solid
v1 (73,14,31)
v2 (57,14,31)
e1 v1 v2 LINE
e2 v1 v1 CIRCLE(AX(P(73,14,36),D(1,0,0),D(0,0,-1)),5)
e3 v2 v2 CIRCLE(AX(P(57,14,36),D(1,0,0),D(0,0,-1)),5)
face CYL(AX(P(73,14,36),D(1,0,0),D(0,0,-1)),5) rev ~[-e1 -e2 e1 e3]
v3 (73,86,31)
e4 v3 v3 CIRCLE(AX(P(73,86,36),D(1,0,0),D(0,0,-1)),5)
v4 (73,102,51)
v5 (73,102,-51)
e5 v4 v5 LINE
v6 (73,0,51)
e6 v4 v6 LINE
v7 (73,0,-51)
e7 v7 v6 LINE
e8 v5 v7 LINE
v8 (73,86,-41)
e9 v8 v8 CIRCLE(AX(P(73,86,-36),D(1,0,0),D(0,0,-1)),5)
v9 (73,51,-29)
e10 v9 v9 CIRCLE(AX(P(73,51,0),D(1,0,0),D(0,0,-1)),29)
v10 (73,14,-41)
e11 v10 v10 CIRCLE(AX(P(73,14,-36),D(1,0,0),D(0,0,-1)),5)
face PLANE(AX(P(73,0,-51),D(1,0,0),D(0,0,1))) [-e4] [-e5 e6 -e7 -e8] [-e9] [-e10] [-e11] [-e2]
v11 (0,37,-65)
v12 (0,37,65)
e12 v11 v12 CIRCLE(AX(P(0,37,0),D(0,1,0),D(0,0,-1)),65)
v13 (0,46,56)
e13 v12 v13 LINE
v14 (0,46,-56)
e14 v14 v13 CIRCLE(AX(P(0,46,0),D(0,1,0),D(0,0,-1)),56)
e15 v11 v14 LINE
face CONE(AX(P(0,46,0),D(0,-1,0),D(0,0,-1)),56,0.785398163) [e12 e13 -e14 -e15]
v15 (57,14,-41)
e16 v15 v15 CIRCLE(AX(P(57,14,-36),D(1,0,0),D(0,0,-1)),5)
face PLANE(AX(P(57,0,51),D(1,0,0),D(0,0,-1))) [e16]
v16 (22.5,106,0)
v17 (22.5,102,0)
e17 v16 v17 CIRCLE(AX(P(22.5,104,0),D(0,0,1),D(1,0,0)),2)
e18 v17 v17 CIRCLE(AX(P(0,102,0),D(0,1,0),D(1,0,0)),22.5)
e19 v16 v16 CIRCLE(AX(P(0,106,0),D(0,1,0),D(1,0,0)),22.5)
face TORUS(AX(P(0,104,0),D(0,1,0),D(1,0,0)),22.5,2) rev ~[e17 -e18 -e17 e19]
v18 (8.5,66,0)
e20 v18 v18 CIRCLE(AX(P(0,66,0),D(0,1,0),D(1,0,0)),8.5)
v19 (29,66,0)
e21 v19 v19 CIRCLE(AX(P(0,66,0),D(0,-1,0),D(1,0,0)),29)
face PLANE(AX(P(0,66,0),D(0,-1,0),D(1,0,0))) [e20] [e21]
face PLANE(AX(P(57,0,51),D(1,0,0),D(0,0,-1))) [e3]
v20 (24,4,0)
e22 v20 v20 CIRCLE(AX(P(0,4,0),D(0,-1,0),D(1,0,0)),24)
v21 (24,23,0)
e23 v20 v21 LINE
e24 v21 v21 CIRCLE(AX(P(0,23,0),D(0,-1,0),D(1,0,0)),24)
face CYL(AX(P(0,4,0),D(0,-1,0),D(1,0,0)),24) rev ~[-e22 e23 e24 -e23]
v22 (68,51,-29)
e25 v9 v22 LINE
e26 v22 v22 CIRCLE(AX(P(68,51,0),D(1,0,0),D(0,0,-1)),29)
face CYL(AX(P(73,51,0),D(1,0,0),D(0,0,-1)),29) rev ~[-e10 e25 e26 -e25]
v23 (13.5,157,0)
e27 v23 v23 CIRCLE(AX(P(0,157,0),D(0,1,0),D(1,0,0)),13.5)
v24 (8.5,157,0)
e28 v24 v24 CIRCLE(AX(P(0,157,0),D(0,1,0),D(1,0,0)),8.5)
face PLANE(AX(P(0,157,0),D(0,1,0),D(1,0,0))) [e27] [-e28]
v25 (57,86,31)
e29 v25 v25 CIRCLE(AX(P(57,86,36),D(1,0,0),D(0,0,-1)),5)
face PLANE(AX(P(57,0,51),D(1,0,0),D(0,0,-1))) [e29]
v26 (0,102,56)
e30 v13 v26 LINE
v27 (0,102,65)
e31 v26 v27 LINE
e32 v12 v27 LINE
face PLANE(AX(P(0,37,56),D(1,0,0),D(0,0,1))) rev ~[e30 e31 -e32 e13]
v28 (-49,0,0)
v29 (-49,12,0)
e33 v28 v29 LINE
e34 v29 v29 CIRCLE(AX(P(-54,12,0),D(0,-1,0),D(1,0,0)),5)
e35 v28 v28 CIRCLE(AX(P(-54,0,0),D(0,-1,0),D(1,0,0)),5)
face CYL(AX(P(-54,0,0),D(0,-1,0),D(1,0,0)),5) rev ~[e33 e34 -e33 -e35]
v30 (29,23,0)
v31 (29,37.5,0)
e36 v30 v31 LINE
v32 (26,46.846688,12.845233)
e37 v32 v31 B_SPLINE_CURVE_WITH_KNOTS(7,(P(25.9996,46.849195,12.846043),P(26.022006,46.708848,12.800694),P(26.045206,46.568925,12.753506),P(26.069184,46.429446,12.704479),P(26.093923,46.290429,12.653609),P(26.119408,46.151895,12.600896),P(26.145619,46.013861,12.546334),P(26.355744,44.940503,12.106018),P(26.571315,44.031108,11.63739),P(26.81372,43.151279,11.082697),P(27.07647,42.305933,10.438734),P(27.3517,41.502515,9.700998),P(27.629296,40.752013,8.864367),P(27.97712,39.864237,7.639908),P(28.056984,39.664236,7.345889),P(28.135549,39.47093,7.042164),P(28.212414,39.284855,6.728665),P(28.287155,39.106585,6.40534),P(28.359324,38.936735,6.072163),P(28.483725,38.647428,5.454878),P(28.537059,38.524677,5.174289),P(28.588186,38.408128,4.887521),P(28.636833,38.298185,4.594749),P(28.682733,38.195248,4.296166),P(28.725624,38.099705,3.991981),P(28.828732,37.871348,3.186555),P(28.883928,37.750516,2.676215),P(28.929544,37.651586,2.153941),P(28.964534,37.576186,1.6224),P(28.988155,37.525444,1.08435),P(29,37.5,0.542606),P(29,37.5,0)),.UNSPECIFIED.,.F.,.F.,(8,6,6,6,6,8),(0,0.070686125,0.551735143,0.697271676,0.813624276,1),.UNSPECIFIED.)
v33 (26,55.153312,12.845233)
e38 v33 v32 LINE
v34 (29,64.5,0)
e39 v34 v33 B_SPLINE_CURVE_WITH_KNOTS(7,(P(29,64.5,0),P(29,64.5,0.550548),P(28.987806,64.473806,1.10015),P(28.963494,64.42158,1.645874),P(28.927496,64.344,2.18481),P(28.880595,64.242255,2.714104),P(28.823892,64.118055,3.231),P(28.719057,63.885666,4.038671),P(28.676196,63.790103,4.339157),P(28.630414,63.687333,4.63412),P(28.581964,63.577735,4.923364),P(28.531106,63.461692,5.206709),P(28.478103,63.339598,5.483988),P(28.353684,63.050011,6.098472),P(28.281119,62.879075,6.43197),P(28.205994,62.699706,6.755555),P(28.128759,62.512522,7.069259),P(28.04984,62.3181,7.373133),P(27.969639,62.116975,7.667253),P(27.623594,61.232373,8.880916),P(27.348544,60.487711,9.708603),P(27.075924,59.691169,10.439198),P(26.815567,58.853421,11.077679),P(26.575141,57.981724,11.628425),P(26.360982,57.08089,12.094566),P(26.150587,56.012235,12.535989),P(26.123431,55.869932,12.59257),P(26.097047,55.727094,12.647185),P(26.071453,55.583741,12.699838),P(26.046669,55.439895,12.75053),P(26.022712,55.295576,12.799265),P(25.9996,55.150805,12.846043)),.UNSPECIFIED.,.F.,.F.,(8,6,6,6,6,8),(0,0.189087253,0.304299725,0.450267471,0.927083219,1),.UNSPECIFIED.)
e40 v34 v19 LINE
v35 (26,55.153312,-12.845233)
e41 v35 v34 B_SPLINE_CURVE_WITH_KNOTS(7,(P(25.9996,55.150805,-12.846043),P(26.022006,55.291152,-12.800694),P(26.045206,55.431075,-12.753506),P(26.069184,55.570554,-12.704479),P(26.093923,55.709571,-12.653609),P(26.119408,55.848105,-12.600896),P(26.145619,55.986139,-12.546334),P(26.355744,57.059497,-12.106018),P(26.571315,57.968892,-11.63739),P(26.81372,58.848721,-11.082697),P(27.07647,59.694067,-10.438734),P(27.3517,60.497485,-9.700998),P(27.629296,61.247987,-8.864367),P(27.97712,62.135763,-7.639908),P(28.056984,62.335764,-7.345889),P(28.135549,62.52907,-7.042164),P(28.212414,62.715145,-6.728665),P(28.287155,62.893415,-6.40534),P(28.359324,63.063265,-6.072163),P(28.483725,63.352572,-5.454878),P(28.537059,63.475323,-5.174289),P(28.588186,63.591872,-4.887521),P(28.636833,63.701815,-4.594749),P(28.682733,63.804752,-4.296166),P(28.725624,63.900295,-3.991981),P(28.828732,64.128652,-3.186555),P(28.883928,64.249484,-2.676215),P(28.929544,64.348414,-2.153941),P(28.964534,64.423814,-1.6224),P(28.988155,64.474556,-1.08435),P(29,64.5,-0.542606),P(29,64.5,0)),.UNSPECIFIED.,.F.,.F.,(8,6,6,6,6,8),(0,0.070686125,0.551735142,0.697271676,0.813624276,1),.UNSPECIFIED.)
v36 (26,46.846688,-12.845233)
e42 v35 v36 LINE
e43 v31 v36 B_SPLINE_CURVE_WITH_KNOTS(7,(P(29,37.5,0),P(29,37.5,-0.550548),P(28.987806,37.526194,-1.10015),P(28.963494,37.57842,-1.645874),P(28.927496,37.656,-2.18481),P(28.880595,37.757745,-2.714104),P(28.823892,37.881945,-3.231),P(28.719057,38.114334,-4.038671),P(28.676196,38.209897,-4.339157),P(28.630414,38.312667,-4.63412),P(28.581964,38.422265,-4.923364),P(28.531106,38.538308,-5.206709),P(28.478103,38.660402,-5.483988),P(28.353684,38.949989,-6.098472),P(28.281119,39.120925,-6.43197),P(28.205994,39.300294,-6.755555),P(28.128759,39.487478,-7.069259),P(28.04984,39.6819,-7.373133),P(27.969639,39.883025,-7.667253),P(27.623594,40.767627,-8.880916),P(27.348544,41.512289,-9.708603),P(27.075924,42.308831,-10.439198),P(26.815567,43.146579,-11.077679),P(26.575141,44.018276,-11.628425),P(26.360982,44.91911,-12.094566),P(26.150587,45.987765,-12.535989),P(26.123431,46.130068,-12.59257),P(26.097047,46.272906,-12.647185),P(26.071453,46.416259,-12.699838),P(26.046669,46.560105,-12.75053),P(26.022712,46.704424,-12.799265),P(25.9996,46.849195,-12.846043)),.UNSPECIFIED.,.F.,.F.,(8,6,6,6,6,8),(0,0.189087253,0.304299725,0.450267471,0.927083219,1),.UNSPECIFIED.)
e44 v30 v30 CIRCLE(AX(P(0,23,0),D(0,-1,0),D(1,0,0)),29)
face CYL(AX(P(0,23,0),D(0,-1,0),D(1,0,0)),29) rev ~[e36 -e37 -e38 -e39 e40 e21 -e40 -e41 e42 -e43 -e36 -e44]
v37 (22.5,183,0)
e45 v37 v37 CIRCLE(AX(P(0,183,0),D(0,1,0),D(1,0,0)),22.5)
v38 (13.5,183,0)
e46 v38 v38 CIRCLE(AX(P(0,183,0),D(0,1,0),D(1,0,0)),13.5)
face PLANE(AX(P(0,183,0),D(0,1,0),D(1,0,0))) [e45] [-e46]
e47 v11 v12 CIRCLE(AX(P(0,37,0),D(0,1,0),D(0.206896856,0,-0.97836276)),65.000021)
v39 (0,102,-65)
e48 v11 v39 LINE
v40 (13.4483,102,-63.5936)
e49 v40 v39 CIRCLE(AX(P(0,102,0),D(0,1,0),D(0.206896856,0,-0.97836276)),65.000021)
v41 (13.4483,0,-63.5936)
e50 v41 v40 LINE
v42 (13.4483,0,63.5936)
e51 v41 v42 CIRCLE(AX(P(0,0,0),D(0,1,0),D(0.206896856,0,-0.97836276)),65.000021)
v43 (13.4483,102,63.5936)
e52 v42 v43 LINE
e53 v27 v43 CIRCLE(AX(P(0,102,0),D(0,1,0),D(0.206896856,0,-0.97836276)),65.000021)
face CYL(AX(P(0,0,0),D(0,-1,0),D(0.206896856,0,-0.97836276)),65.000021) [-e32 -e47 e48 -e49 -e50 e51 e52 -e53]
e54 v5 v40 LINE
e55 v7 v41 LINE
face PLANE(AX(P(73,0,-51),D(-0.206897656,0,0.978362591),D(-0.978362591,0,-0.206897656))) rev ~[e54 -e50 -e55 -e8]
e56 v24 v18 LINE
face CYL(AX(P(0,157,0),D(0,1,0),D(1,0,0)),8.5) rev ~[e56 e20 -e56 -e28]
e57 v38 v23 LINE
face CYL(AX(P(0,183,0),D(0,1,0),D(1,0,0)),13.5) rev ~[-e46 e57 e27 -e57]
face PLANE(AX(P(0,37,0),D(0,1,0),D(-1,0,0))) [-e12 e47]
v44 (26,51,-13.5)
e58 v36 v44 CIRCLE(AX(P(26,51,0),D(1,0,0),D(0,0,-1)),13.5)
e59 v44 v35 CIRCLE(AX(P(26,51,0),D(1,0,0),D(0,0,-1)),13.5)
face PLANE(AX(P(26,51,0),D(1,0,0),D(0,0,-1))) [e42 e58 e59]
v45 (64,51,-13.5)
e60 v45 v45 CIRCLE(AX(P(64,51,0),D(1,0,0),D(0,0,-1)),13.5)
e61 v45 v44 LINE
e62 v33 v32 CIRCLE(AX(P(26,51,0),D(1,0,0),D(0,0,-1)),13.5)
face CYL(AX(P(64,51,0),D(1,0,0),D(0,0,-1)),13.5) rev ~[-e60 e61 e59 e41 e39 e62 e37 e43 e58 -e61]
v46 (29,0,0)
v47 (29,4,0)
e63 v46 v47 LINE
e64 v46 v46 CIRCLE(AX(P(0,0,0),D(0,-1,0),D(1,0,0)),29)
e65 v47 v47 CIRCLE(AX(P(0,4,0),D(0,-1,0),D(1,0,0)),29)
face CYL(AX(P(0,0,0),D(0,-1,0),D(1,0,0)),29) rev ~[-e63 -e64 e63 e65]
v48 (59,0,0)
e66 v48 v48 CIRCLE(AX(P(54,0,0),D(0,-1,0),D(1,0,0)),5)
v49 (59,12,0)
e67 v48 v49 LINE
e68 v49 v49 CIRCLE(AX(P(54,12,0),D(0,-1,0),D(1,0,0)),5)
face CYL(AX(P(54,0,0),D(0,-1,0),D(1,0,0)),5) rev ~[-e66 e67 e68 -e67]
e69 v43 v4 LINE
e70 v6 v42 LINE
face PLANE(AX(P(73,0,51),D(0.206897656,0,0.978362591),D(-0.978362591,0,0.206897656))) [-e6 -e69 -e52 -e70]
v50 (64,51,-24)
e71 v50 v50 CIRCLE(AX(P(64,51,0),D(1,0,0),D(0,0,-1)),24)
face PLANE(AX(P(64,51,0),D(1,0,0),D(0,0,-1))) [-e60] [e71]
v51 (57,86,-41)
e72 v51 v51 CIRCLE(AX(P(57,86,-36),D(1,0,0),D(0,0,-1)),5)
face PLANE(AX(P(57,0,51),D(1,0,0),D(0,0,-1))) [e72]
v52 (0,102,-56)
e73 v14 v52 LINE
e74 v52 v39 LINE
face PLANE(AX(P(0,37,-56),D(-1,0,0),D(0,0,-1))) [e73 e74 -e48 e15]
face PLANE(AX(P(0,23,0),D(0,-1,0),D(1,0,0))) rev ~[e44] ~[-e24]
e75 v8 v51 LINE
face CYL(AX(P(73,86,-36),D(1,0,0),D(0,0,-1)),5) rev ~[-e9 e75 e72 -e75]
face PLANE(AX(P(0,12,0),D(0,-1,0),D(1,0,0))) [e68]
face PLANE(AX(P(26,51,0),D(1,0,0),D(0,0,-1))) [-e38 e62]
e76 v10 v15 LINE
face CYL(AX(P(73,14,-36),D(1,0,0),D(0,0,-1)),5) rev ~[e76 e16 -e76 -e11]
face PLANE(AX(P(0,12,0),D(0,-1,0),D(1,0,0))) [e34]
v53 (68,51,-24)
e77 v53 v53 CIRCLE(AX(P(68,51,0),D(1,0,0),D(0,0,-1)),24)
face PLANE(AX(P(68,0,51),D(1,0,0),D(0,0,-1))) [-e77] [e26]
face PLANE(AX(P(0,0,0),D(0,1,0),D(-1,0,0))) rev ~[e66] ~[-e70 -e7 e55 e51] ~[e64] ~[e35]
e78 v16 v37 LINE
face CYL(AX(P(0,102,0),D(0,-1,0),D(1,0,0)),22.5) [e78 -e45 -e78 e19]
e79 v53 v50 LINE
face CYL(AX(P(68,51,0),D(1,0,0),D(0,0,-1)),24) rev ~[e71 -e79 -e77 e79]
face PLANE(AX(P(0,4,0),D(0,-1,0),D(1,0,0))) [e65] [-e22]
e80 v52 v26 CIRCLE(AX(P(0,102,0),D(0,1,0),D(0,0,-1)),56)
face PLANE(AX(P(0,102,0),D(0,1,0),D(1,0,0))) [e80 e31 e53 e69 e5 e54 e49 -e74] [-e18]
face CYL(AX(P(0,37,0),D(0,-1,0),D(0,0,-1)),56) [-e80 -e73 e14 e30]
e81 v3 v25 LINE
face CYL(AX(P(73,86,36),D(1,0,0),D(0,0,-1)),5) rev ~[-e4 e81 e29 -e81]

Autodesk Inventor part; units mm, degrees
ref_plane "YZ Plane" through (0, 0, 0) normal (1, 0, 0) x (0, 1, 0)
ref_plane "XZ Plane" through (0, 0, 0) normal (0, 1, 0) x (-1, 0, 0)
ref_plane "XY Plane" through (0, 0, 0) normal (0, 0, 1) x (1, 0, 0)
sketch "Sketch19" plane through (0, 0, 0) normal (0, 1, 0) x (-1, 0, 0)
  arc A0 (-13.4483, -63.5936) -> (-13.4483, 63.5936) centre (0, 0) ccw
  line L0 (-73, -51) -> (-73, 51)
  line L1 (-73, 51) -> (-13.4483, 63.5936)
  line L2 (-73, -51) -> (-13.4483, -63.5936)
  dimension "d91" = 130
  dimension "d93" = 102
extrude "Extrusion18" add sketch "Sketch19" along normal blind 37
sketch "Sketch20" plane through (0, 37, 0) normal (0, 1, 0) x (1, 0, 0)
  arc A0 (0, 56) -> (0, -56) centre (0, 0) ccw
  line L0 (0, -56) -> (0, -65)
  line L1 (0, 56) -> (0, 65)
  arc A1 (13.4483, 63.5936) -> (13.4483, -63.5936) centre (0, 0) ccw projected
  line L2 (13.4483, -63.5936) -> (73, -51) projected
  line L3 (73, -51) -> (73, 51) projected
  line L4 (73, 51) -> (13.4483, 63.5936) projected
  dimension "d96" = 112
extrude "Extrusion19" add sketch "Sketch20" along normal blind 65 contours L1 A1 L4 L3 L2 L0 A0
chamfer "Chamfer2" distance 9 angle 45 1 edges at (-56, 37, 0)
sketch "Sketch21" plane through (0, 0, 0) normal (0, -1, 0) x (1, 0, 0)
  circle A0 centre (0, 0) radius 29
  dimension "d102" = 58
extrude "Extrusion20" cut sketch "Sketch21" against normal blind 4
sketch "Sketch22" plane through (0, 4, 0) normal (0, -1, 0) x (1, 0, 0)
  circle A0 centre (0, 0) radius 24
  dimension "d105" = 48
extrude "Extrusion21" cut sketch "Sketch22" against normal blind 19
sketch "Sketch23" plane through (0, 0, 0) normal (0, -1, 0) x (1, 0, 0)
  circle A0 centre (-54, 0) radius 5
  circle A1 centre (54, 0) radius 5
  point P0 (0, 0)
  dimension "d109" = 10
  dimension "d110" = 10
extrude "Extrusion22" cut sketch "Sketch23" against normal blind 12
sketch "Sketch24" plane through (73, 0, 51) normal (1, 0, 0) x (0, 0, -1)
  line L0 (0, 102) -> (102, 102) projected
  line L1 (102, 0) -> (102, 102) projected
  line L2 (0, 0) -> (0, 102) projected
  line L3 (0, 0) -> (102, 0) projected
  circle A0 centre (51, 51) radius 29
  point P0 (51, 0)
  dimension "d113" = 58
extrude "Extrusion23" cut sketch "Sketch24" against normal blind 5 contours A0
sketch "Sketch25" plane through (68, 51, 0) normal (1, 0, 0) x (0, 0, -1)
  circle A0 centre (0, 0) radius 24
  point P0 (0, -51)
  dimension "d116" = 48
extrude "Extrusion24" cut sketch "Sketch25" against normal blind 4
sketch "Sketch26" plane through (64, 51, 0) normal (1, 0, 0) x (0, 0, -1)
  circle A0 centre (0, 0) radius 13.5
  point P0 (0, -51)
  dimension "d119" = 27
extrude "Extrusion25" cut sketch "Sketch26" against normal blind 38
sketch "Sketch27" plane through (73, 0, 51) normal (1, 0, 0) x (0, 0, -1)
  line L0 (15, 86) -> (87, 14) construction
  line L1 (87, 86) -> (15, 14) construction
  circle A0 centre (15, 86) radius 5
  circle A1 centre (87, 86) radius 5
  circle A2 centre (87, 14) radius 5
  circle A3 centre (15, 14) radius 5
  point P0 (51, 0)
  point P1 (51, 50)
  dimension "d125" = 72
  dimension "d126" = 72
  dimension "d127" = 10
  dimension "d128" = 10
  dimension "d129" = 10
  dimension "d130" = 10
extrude "Extrusion26" cut sketch "Sketch27" against normal blind 16
sketch "Sketch28" plane through (0, 102, 0) normal (0, 1, 0) x (1, 0, 0)
  circle A0 centre (0, 0) radius 22.5
  dimension "d133" = 45
extrude "Extrusion27" add sketch "Sketch28" along normal blind 81
sketch "Sketch29" plane through (0, 183, 0) normal (0, 1, 0) x (1, 0, 0)
  circle A0 centre (0, 0) radius 13.5
  dimension "d136" = 27
extrude "Extrusion28" cut sketch "Sketch29" against normal blind 26
sketch "Sketch30" plane through (0, 157, 0) normal (0, 1, 0) x (1, 0, 0)
  circle A0 centre (0, 0) radius 8.5
  dimension "d139" = 17
extrude "Extrusion29" cut sketch "Sketch30" against normal blind 91
sketch "Sketch31" plane through (0, 0, 0) normal (0, 0, 1) x (1, 0, 0)
  line L0 (22.5, 102) -> (22.5, 183) projected
  line L1 (22.5, 102) -> (22.5, 106)
  line L2 (22.5, 102) -> (26.5, 102) construction
  circle A0 centre (22.5, 104) radius 2
  line L3 (-92.6, 0) -> (100.6, 0) projected
  line L4 (0, -36.6) -> (0, 219.6) projected
  point P0 (0, 0)
  dimension "d142" = 4
  dimension "d143" = 90
revolve "Revolution1" cut sketch "Sketch31" angle 360 about axis through (0, -10, 0) along (0, 1, 0)
sketch "Sketch32" plane through (0, 23, 0) normal (0, -1, 0) x (1, 0, 0)
  circle A0 centre (0, 0) radius 29
  dimension "d146" = 58
extrude "Extrusion30" cut sketch "Sketch32" against normal blind 43
thread "Thread10" size "M20x2.5" class "6H" standard "ANSI Metric M Profile" full length
thread "Thread11" size "M12x1.75" class "6H" standard "ANSI Metric M Profile" full length
thread "Thread12" size "M12x1.75" class "6H" standard "ANSI Metric M Profile" full length
thread "Thread13" size "M12x1.75" class "6H" standard "ANSI Metric M Profile" full length
thread "Thread14" size "M12x1.75" class "6H" standard "ANSI Metric M Profile" full length
thread "Thread15" size "M45x4.5" class "6g" standard "ANSI Metric M Profile" full length
thread "Thread16" size "M12x1.75" class "6H" standard "ANSI Metric M Profile" full length
thread "Thread17" size "M12x1.75" class "6H" standard "ANSI Metric M Profile" full length
properties part number "00.32.001 \"Housing \"" material "Steel"
